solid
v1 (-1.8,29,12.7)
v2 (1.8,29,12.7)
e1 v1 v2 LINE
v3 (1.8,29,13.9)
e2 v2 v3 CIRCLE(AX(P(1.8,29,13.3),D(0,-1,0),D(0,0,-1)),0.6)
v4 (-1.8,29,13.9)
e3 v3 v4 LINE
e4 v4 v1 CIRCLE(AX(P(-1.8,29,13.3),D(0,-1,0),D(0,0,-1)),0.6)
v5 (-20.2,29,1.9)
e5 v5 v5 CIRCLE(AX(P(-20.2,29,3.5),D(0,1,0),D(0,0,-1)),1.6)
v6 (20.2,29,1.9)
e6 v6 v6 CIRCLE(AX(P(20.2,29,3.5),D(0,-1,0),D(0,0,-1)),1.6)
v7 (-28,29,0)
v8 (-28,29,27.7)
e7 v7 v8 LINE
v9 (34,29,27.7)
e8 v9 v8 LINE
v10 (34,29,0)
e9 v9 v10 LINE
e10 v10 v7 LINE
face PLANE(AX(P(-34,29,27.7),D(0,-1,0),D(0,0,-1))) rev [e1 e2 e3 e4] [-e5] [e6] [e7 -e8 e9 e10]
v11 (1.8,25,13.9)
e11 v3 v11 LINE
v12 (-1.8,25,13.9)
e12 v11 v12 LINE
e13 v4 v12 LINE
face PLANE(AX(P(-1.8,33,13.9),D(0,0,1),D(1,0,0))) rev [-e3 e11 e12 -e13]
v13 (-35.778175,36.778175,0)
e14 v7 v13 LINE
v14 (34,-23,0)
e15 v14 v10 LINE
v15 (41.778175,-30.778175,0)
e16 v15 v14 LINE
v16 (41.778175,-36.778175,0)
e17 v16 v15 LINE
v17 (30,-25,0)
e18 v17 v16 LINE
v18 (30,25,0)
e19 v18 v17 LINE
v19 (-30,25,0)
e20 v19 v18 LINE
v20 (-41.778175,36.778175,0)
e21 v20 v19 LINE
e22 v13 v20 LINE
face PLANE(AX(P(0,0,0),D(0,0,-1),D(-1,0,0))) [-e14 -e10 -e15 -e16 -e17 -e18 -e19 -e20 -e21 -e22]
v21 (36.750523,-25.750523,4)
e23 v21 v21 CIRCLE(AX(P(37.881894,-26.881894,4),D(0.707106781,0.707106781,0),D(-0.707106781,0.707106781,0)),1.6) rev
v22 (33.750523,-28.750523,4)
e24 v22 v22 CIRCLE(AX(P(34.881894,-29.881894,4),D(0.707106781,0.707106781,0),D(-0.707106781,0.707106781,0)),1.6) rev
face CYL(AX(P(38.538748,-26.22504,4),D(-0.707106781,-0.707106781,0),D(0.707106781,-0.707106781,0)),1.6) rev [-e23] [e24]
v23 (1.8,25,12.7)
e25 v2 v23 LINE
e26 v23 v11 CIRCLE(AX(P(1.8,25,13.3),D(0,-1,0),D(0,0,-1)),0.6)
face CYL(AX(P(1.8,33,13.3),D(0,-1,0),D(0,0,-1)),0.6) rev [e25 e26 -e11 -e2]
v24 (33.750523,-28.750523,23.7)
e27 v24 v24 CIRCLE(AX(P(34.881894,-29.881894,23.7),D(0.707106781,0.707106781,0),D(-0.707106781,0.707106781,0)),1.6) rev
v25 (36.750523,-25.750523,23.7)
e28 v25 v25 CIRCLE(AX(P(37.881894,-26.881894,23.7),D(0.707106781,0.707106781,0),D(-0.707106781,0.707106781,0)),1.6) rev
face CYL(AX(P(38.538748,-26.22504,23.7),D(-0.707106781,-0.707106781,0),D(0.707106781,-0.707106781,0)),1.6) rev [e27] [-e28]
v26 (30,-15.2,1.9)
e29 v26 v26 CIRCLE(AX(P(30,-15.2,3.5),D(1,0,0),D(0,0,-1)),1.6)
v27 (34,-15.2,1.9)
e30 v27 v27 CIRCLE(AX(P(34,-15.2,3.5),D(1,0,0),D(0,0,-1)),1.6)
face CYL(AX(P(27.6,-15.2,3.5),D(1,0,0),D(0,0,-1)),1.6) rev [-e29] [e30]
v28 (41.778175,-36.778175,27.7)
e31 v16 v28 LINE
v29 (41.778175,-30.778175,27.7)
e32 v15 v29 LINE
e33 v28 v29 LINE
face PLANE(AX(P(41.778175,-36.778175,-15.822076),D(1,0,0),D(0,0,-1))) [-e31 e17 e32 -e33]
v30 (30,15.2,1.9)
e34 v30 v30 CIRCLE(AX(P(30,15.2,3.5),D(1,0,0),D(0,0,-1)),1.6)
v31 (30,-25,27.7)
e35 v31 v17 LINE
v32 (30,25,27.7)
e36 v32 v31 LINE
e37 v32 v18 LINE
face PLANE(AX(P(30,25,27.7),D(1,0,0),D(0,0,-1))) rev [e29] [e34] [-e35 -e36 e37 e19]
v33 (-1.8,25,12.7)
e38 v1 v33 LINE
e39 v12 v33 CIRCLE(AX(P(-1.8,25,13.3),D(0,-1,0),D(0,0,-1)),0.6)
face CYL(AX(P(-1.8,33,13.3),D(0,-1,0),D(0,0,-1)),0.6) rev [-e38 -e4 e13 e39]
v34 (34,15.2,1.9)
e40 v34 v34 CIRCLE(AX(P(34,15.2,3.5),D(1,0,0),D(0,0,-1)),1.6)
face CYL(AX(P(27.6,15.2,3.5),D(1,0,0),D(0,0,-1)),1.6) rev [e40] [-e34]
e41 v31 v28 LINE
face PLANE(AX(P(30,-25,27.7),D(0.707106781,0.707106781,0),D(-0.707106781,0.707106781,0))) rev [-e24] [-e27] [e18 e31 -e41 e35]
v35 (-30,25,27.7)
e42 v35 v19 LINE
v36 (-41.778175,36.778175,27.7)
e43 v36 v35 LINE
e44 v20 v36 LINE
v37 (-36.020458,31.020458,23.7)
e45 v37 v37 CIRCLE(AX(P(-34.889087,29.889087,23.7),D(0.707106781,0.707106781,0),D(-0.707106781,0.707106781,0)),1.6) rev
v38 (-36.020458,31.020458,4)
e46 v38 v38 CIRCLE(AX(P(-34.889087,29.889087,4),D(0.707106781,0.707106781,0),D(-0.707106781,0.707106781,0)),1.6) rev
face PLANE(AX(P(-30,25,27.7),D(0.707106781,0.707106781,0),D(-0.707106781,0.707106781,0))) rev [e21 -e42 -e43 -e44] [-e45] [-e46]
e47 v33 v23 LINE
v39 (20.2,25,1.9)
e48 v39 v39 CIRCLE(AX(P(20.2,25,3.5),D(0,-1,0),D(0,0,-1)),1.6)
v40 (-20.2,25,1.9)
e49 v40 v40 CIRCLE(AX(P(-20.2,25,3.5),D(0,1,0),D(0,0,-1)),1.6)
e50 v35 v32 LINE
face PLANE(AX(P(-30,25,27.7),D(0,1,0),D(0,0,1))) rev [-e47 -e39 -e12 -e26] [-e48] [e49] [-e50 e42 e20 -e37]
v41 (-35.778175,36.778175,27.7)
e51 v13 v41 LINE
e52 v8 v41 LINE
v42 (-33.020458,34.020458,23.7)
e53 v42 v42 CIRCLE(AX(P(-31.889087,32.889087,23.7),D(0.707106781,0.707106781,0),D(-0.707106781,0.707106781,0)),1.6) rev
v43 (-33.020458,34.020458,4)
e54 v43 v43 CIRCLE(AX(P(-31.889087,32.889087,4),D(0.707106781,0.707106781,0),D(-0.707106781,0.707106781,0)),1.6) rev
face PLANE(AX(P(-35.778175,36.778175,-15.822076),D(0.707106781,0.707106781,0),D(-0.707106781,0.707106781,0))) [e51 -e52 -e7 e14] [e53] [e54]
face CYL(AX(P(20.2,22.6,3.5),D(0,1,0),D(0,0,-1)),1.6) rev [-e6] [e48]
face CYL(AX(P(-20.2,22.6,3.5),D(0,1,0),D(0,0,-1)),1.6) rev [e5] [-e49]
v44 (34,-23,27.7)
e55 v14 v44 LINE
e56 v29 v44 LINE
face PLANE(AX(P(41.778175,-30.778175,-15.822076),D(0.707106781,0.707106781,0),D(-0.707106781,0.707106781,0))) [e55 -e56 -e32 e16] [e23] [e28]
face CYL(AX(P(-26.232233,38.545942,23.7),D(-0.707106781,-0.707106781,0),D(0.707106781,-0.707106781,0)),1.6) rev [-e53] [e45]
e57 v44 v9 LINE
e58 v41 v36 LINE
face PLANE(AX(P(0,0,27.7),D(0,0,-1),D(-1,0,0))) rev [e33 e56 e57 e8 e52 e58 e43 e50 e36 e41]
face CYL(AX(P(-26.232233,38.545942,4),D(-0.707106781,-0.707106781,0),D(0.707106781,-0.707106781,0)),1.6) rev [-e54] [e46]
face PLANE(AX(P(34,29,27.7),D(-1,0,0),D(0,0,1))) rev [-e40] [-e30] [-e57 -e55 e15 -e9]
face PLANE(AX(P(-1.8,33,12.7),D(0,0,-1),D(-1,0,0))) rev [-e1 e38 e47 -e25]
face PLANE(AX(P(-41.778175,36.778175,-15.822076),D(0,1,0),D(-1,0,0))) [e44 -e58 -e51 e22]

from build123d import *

# Parameters (mm, degrees)
BOSS_EXTRUDE1_DEPTH     = 27.7
SKETCH2_R               = 1.6
CUT_EXTRUDE1_DEPTH      = 6.4
MIRROR1_START           = 25
MIRROR1_OUTLINE_R       = 1.6
MIRROR1_DEPTH           = 4
BOSS_EXTRUDE2_DEPTH     = 27.7
CUT_EXTRUDE2_DEPTH      = 8
CUT_EXTRUDE2_DEPTH_BACK = 8
SKETCH4_R               = 1.6
CUT_EXTRUDE3_DEPTH      = 8


# Read off the part's stored shape, not the designer's step: Mirror1
with BuildPart() as part:
    # Sketch1 → Boss-Extrude1 (new body)
    with BuildSketch(Plane.XY):
        Polygon((-34, 29), (34, 29), (34, -29), (30, -25), (30, 25), (-30, 25), align=None)
    extrude(amount=BOSS_EXTRUDE1_DEPTH)

    # Sketch2 → Cut-Extrude1 (cut)
    with BuildSketch(Plane(origin=(34, 0, 0), x_dir=(0, 0, -1), z_dir=(1, 0, 0))):
        with Locations((-3.5, -15.2)):
            Circle(SKETCH2_R)
        with Locations((-3.5, 15.2)):
            Circle(SKETCH2_R)
    extrude(amount=-CUT_EXTRUDE1_DEPTH, mode=Mode.SUBTRACT)

    # Mirror1 outline → Mirror1 (cut)
    with BuildSketch(Plane(origin=(0, 0, 0), x_dir=(1, 0, 0), z_dir=(0, 1, 0)).offset(MIRROR1_START)):
        with Locations((20.2, -3.5)):
            Circle(MIRROR1_OUTLINE_R)
    mirror1 = extrude(amount=MIRROR1_DEPTH, mode=Mode.SUBTRACT)

    # Mirror2: Mirror1 across plane
    add(mirror1.mirror(Plane(origin=(0, 0, 0), x_dir=(0, 0, 1), z_dir=(1, 0, 0))), mode=Mode.SUBTRACT)

    # Sketch3 → Boss-Extrude2 (add)
    with BuildSketch(Plane.XY.offset(27.7)):
        Polygon((-34, 29), (-41.778174593, 36.778174593), (-35.778174593, 36.778174593), (-28, 29), align=None)
        Polygon((34, -29), (41.778174593, -36.778174593), (41.778174593, -30.778174593), (34, -23), align=None)
    extrude(amount=-BOSS_EXTRUDE2_DEPTH)

    # Sketch4 → Cut-Extrude2 (cut, two sides: drawn at the far end of the back side and taken through both)
    with BuildSketch(Plane(origin=(0.5, 0.5, 0), x_dir=(0, 0, -1), z_dir=(0.7071067811865475, 0.7071067811865477, 0)).offset(-CUT_EXTRUDE2_DEPTH_BACK)):
        with Locations(Location((-4, 45.805086528, 0), (0, 0, 90))):
            Circle(SKETCH4_R)
        with Locations(Location((-23.7, 45.805086528, 0), (0, 0, 90))):
            Circle(SKETCH4_R)
        with Locations(Location((-23.7, -45.794913472, 0), (0, 0, 90))):
            Circle(SKETCH4_R)
        with Locations(Location((-4, -45.794913472, 0), (0, 0, 90))):
            Circle(SKETCH4_R)
    extrude(amount=CUT_EXTRUDE2_DEPTH + CUT_EXTRUDE2_DEPTH_BACK, mode=Mode.SUBTRACT)

    # Sketch5 → Cut-Extrude3 (cut)
    with BuildSketch(Plane.XZ.offset(-25)):
        with BuildLine():
            Line((-1.8, 13.9), (1.8, 13.9))
            ThreePointArc((1.8, 13.9), (2.4, 13.3), (1.8, 12.7))
            Line((1.8, 12.7), (-1.8, 12.7))
            ThreePointArc((-1.8, 12.7), (-2.4, 13.3), (-1.8, 13.9))
        make_face()
    extrude(amount=-CUT_EXTRUDE3_DEPTH, mode=Mode.SUBTRACT)


solid = part.part
